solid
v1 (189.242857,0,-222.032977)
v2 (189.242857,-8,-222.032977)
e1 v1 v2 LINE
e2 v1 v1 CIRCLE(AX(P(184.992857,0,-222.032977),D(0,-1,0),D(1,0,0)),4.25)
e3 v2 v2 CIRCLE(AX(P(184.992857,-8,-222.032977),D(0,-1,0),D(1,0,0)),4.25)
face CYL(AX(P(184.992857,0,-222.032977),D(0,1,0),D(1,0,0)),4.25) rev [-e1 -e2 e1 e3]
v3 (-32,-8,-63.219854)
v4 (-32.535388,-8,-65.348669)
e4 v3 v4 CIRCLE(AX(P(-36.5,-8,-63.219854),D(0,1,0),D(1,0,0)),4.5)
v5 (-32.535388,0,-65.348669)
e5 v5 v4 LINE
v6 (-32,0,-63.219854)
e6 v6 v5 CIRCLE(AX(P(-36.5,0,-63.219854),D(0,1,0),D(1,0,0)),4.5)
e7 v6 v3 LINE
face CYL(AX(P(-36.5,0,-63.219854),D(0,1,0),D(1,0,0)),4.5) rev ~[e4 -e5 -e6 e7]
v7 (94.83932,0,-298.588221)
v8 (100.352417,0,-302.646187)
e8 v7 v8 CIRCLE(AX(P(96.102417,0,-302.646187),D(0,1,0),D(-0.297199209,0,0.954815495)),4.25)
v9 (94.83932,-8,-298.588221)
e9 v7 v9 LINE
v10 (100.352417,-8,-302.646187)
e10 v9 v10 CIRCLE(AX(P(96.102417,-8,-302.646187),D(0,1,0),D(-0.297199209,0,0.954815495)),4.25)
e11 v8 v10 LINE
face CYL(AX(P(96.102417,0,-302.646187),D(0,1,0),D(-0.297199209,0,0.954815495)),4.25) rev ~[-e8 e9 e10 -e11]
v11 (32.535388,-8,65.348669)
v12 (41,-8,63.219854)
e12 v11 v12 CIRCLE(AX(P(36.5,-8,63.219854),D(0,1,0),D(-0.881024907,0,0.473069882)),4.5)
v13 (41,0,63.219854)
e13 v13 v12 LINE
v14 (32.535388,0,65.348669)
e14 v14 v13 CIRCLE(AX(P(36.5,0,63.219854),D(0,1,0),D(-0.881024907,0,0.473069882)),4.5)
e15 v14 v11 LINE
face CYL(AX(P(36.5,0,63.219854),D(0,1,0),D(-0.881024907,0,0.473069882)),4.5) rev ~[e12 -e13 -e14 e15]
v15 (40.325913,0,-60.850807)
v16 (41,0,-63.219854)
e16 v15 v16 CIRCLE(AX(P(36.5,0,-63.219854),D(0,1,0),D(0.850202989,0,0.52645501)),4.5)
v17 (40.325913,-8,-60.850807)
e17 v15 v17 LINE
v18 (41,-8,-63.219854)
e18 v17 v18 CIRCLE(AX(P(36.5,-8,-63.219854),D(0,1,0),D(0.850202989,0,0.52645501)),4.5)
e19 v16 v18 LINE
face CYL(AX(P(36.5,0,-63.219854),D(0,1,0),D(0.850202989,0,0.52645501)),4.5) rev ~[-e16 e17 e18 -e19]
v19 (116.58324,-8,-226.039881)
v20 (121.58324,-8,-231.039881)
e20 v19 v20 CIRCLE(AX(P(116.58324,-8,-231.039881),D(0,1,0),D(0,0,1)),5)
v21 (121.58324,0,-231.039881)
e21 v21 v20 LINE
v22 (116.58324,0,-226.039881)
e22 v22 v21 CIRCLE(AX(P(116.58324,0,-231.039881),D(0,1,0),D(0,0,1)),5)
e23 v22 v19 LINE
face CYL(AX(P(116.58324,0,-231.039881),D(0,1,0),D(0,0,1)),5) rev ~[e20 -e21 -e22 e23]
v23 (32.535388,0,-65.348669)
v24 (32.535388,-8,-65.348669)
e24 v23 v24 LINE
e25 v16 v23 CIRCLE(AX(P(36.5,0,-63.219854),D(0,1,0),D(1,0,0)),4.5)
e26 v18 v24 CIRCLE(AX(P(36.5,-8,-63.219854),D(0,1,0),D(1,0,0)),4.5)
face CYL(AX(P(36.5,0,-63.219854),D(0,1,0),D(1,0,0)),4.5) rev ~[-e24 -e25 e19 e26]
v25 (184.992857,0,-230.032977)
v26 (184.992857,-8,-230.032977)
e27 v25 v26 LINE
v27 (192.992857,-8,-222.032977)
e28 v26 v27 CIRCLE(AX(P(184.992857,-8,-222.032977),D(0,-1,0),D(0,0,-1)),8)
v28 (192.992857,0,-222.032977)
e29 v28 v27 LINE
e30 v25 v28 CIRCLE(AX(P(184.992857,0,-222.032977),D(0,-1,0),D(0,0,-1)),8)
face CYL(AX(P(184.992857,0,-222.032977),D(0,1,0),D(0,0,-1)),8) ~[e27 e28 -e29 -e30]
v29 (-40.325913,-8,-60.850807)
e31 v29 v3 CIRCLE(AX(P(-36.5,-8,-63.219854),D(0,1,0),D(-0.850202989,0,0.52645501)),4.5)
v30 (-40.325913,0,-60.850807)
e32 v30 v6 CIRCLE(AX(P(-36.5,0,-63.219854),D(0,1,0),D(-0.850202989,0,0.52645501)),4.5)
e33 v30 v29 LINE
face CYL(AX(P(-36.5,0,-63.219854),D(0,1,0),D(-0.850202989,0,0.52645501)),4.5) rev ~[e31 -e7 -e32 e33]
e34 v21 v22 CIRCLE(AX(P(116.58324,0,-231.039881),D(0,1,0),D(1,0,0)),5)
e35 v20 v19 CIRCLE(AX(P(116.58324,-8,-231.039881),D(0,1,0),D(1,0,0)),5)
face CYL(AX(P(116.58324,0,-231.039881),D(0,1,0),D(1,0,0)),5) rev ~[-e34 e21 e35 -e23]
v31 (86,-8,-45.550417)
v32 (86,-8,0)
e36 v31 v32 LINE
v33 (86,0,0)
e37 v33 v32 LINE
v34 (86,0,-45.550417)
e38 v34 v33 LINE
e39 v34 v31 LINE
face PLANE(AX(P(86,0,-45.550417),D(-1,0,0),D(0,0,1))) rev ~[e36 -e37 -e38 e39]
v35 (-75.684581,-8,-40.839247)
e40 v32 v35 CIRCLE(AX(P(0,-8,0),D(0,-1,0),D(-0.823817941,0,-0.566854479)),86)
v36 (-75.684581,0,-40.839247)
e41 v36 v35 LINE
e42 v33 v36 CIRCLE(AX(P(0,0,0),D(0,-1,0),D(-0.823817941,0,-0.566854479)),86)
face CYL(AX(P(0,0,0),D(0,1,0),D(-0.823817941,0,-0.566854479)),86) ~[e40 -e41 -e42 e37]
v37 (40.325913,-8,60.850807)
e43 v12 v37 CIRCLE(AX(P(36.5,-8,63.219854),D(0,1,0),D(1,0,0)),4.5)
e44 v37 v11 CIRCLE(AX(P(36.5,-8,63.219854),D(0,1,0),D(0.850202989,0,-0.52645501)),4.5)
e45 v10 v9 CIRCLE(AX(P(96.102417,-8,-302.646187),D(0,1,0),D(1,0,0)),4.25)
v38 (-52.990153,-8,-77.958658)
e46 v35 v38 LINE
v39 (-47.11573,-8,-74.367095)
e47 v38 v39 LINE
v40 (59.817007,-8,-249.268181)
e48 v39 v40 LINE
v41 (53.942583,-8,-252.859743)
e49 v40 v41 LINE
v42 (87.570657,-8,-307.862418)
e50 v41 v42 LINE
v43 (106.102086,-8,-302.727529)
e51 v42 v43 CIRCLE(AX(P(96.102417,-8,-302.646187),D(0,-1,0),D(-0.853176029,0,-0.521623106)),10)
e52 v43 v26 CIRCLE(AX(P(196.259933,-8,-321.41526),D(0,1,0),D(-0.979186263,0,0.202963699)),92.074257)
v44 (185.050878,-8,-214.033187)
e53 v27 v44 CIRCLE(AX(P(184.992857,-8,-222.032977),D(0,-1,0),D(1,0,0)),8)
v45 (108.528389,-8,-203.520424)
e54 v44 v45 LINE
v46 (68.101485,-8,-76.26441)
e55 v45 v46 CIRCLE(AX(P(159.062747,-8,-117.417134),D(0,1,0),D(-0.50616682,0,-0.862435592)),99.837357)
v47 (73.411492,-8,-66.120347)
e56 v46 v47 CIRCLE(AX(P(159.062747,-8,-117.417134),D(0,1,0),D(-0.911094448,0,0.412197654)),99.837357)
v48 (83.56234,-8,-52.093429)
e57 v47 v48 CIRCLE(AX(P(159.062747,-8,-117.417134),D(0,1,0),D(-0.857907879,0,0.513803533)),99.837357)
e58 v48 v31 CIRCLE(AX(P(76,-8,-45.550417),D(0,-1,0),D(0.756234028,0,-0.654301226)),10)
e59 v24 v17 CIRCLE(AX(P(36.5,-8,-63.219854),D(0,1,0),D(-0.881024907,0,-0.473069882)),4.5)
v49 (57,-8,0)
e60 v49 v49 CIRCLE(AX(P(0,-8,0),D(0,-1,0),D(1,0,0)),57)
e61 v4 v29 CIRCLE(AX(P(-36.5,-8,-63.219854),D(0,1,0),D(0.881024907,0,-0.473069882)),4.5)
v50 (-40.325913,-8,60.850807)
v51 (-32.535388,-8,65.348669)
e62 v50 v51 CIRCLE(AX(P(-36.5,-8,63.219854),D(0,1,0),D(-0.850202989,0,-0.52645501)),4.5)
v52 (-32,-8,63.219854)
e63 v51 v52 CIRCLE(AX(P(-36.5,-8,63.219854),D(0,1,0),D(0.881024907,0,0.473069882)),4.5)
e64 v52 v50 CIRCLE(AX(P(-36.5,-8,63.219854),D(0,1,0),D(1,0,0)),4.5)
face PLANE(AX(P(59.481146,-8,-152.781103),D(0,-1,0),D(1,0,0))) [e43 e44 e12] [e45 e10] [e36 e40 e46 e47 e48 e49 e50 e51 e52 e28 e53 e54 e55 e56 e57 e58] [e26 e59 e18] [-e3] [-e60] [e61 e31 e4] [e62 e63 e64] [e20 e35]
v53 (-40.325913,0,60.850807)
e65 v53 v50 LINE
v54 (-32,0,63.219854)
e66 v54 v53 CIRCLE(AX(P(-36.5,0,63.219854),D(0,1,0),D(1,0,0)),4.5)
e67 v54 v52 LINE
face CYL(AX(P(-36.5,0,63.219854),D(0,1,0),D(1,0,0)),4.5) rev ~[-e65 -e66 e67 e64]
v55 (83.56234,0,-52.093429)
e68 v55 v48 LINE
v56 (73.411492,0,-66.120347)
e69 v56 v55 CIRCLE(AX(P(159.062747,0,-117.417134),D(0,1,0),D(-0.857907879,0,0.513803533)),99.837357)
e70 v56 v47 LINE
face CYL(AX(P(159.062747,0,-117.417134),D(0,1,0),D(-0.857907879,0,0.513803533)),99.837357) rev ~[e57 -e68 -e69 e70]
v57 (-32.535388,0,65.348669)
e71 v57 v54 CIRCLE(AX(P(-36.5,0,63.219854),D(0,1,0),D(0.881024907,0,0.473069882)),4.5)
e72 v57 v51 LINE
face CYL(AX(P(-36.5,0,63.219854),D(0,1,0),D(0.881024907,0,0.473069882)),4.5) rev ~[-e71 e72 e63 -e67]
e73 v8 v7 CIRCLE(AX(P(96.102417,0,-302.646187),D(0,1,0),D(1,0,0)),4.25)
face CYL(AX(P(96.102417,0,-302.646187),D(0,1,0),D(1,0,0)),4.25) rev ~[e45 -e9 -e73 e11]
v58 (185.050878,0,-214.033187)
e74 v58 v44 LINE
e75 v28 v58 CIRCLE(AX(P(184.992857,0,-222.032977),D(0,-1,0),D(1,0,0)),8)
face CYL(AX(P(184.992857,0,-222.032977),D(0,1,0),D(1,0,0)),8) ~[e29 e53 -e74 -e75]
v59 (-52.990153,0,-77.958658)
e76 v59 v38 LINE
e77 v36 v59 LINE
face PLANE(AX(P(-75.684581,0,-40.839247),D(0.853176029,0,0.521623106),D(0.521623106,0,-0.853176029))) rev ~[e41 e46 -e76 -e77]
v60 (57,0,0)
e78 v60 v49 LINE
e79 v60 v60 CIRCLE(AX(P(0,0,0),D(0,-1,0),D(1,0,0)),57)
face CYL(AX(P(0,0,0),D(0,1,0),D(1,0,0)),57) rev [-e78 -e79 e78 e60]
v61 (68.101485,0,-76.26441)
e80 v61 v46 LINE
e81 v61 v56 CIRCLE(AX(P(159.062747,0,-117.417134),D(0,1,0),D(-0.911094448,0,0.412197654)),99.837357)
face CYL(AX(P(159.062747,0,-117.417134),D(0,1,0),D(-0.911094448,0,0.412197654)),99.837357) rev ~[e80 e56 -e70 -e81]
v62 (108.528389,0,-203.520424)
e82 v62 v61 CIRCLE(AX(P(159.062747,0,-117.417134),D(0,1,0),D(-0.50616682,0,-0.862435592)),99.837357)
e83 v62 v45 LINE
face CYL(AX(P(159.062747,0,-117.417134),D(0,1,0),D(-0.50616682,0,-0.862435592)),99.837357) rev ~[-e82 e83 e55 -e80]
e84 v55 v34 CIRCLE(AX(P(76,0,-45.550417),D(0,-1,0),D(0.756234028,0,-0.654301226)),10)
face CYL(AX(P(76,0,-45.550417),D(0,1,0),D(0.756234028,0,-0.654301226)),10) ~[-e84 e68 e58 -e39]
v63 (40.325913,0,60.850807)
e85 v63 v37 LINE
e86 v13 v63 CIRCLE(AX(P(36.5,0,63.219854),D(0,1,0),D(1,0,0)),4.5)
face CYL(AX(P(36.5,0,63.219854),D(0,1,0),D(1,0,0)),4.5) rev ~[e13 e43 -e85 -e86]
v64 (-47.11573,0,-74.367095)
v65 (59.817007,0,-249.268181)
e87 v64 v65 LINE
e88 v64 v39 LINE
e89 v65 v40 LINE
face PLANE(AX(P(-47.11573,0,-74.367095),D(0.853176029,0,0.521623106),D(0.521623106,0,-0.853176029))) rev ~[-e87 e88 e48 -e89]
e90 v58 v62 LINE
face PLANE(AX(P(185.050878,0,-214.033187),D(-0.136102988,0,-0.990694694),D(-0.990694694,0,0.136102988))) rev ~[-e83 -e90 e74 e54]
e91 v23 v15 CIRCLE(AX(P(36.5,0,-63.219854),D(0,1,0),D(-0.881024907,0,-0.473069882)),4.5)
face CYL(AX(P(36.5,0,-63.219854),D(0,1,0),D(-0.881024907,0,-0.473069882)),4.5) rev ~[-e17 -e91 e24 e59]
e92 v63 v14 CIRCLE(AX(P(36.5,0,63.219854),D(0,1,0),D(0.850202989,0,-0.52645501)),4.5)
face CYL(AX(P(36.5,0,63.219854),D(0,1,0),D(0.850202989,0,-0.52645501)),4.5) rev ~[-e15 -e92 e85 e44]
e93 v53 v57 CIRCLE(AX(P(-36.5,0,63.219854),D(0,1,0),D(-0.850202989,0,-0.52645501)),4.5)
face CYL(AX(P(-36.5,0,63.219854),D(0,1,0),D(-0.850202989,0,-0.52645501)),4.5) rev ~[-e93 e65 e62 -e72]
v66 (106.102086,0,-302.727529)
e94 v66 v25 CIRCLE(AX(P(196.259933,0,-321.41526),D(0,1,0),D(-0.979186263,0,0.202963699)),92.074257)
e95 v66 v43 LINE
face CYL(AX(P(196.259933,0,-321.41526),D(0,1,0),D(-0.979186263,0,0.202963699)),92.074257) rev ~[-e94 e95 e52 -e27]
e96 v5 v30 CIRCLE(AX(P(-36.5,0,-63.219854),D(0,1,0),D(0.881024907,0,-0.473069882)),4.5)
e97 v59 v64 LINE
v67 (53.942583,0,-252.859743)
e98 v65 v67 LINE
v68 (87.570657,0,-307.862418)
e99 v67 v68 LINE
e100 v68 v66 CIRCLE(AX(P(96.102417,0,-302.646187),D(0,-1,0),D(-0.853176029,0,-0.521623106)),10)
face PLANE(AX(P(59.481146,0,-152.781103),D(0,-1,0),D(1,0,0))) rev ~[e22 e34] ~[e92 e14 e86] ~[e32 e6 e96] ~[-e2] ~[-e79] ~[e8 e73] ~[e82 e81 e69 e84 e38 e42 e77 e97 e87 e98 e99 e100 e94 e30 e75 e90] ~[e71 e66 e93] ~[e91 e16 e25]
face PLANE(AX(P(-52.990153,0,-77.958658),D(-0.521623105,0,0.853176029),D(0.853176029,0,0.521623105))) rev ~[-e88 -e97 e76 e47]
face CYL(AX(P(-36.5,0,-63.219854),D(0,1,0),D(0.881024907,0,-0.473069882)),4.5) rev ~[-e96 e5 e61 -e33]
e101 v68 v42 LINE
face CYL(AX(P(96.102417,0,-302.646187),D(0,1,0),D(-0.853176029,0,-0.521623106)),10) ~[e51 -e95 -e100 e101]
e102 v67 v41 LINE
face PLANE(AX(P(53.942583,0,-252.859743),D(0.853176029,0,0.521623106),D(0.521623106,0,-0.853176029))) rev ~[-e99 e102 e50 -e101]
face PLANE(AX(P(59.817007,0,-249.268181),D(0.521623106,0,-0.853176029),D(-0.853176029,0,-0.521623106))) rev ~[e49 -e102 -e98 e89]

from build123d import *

# Parameters (mm, degrees)
F0_R     = 4.25
F0_R_2   = 57
F1_DEPTH = 8


# Not quite as in the source:
# - a feature names something its author has since deleted; it is built from what else it names


with BuildPart() as f1:
    # F0 (on Front) → F1 (new body)
    with BuildSketch(Plane.XZ):
        with BuildLine():
            Line((86, -45.5504168361), (86, 0))
            ThreePointArc((86, 0), (25.52491441, -82.1247754601), (-70.8483428922, -48.7494852222))
            Line((-70.8483428922, -48.7494852222), (-52.9901534319, -77.9586575178))
            Line((-52.9901534319, -77.9586575178), (-47.1157296051, -74.3670948194))
            Line((-47.1157296051, -74.3670948194), (59.817007023, -249.2681806857))
            Line((59.817007023, -249.2681806857), (53.9425831962, -252.8597433842))
            Line((53.9425831962, -252.8597433842), (87.570656583, -307.862418303))
            ThreePointArc((87.570656583, -307.862418303), (86.7439526122, -299.1221062681), (93.1304247757, -293.0980322955))
            ThreePointArc((93.1304247757, -293.0980322955), (102.0303203377, -294.5926190657), (106.1024168691, -302.646187248))
            ThreePointArc((106.1024168691, -302.646187248), (106.1023341619, -302.6868583365), (106.1020860416, -302.7275287523))
            ThreePointArc((106.1020860416, -302.7275287523), (133.8669990345, -253.7041794438), (184.9928569387, -230.0329770139))
            ThreePointArc((184.9928569387, -230.0329770139), (176.9929095406, -222.0039661985), (185.0508781881, -214.0331874208))
            Line((185.0508781881, -214.0331874208), (108.5283892756, -203.5204235365))
            ThreePointArc((108.5283892756, -203.5204235365), (63.9114156279, -147.6449683437), (68.1014852993, -76.2644097396))
            ThreePointArc((68.1014852993, -76.2644097396), (70.6109477759, -71.1161938658), (73.4114917534, -66.1203473875))
            ThreePointArc((73.4114917534, -66.1203473875), (78.1822601822, -58.8864182021), (83.5623402825, -52.0934290975))
            ThreePointArc((83.5623402825, -52.0934290975), (85.3707897966, -49.0415912213), (86, -45.5504168361))
        make_face()
        with BuildLine():
            ThreePointArc((116.5832400171, -226.0398806244), (120.1187739231, -227.5043467184), (121.5832400171, -231.0398806244))
            ThreePointArc((121.5832400171, -231.0398806244), (113.0477061112, -234.5754145303), (116.5832400171, -226.0398806244))
        make_face(mode=Mode.SUBTRACT)
        with BuildLine():
            ThreePointArc((93.1304247757, -293.0980322955), (86.7439526122, -299.1221062681), (87.570656583, -307.862418303))
            ThreePointArc((87.570656583, -307.862418303), (98.7727093249, -312.2830715059), (106.1020860416, -302.7275287523))
            ThreePointArc((106.1020860416, -302.7275287523), (106.1023341619, -302.6868583365), (106.1024168691, -302.646187248))
            ThreePointArc((106.1024168691, -302.646187248), (102.0303203377, -294.5926190657), (93.1304247757, -293.0980322955))
        make_face()
        with BuildLine():
            ThreePointArc((100.3524168691, -302.646187248), (93.583057895, -306.0689537255), (94.8393202294, -298.5882213932))
            ThreePointArc((94.8393202294, -298.5882213932), (98.6217758433, -299.2234207705), (100.3524168691, -302.646187248))
        make_face(mode=Mode.SUBTRACT)
        with BuildLine():
            ThreePointArc((192.9928569387, -222.0329770139), (190.6701877373, -216.3966737039), (185.0508781881, -214.0331874208))
            ThreePointArc((185.0508781881, -214.0331874208), (176.9929095406, -222.0039661985), (184.9928569387, -230.0329770139))
            ThreePointArc((184.9928569387, -230.0329770139), (190.6497111882, -227.6898312634), (192.9928569387, -222.0329770139))
        make_face()
        with Locations((184.9928569387, -222.0329770139)):
            Circle(F0_R, mode=Mode.SUBTRACT)
        with BuildLine():
            ThreePointArc((-70.8483428922, -48.7494852222), (25.52491441, -82.1247754601), (86, 0))
            ThreePointArc((86, 0), (-21.0609353072, 83.3812749002), (-75.6845814881, -40.8392473605))
            Line((-75.6845814881, -40.8392473605), (-70.8483428922, -48.7494852222))
        make_face()
        with BuildLine():
            ThreePointArc((40.3259134511, 60.8508069325), (64.3148182067, 34.5341013932), (73, 0))
            ThreePointArc((73, 0), (64.3148182067, -34.5341013932), (40.3259134511, -60.8508069325))
            ThreePointArc((40.3259134511, -60.8508069325), (40.8281988477, -61.9883128671), (41, -63.2198544763))
            ThreePointArc((41, -63.2198544763), (37.5975531045, -67.5839554355), (32.5353879188, -65.3486689457))
            ThreePointArc((32.5353879188, -65.3486689457), (0, -73), (-32.5353879188, -65.3486689457))
            ThreePointArc((-32.5353879188, -65.3486689457), (-38.75, -67.1169687933), (-40.3259134511, -60.8508069325))
            ThreePointArc((-40.3259134511, -60.8508069325), (-73, 0), (-40.3259134511, 60.8508069325))
            ThreePointArc((-40.3259134511, 60.8508069325), (-38.75, 67.1169687933), (-32.5353879188, 65.3486689457))
            ThreePointArc((-32.5353879188, 65.3486689457), (0, 73), (32.5353879188, 65.3486689457))
            ThreePointArc((32.5353879188, 65.3486689457), (37.5975531045, 67.5839554355), (41, 63.2198544763))
            ThreePointArc((41, 63.2198544763), (40.8281988477, 61.9883128671), (40.3259134511, 60.8508069325))
        make_face(mode=Mode.SUBTRACT)
        with BuildLine():
            ThreePointArc((40.3259134511, -60.8508069325), (64.3148182067, -34.5341013932), (73, 0))
            ThreePointArc((73, 0), (64.3148182067, 34.5341013932), (40.3259134511, 60.8508069325))
            ThreePointArc((40.3259134511, 60.8508069325), (34.25, 59.3227401592), (32.5353879188, 65.3486689457))
            ThreePointArc((32.5353879188, 65.3486689457), (0, 73), (-32.5353879188, 65.3486689457))
            ThreePointArc((-32.5353879188, 65.3486689457), (-32.1358990407, 64.3174075808), (-32, 63.2198544763))
            ThreePointArc((-32, 63.2198544763), (-35.2684583909, 58.8916556286), (-40.3259134511, 60.8508069325))
            ThreePointArc((-40.3259134511, 60.8508069325), (-73, 0), (-40.3259134511, -60.8508069325))
            ThreePointArc((-40.3259134511, -60.8508069325), (-35.2684583909, -58.8916556286), (-32, -63.2198544763))
            ThreePointArc((-32, -63.2198544763), (-32.1358990407, -64.3174075808), (-32.5353879188, -65.3486689457))
            ThreePointArc((-32.5353879188, -65.3486689457), (0, -73), (32.5353879188, -65.3486689457))
            ThreePointArc((32.5353879188, -65.3486689457), (34.25, -59.3227401592), (40.3259134511, -60.8508069325))
        make_face()
        Circle(F0_R_2, mode=Mode.SUBTRACT)
    extrude(amount=F1_DEPTH)


solid = f1.part
